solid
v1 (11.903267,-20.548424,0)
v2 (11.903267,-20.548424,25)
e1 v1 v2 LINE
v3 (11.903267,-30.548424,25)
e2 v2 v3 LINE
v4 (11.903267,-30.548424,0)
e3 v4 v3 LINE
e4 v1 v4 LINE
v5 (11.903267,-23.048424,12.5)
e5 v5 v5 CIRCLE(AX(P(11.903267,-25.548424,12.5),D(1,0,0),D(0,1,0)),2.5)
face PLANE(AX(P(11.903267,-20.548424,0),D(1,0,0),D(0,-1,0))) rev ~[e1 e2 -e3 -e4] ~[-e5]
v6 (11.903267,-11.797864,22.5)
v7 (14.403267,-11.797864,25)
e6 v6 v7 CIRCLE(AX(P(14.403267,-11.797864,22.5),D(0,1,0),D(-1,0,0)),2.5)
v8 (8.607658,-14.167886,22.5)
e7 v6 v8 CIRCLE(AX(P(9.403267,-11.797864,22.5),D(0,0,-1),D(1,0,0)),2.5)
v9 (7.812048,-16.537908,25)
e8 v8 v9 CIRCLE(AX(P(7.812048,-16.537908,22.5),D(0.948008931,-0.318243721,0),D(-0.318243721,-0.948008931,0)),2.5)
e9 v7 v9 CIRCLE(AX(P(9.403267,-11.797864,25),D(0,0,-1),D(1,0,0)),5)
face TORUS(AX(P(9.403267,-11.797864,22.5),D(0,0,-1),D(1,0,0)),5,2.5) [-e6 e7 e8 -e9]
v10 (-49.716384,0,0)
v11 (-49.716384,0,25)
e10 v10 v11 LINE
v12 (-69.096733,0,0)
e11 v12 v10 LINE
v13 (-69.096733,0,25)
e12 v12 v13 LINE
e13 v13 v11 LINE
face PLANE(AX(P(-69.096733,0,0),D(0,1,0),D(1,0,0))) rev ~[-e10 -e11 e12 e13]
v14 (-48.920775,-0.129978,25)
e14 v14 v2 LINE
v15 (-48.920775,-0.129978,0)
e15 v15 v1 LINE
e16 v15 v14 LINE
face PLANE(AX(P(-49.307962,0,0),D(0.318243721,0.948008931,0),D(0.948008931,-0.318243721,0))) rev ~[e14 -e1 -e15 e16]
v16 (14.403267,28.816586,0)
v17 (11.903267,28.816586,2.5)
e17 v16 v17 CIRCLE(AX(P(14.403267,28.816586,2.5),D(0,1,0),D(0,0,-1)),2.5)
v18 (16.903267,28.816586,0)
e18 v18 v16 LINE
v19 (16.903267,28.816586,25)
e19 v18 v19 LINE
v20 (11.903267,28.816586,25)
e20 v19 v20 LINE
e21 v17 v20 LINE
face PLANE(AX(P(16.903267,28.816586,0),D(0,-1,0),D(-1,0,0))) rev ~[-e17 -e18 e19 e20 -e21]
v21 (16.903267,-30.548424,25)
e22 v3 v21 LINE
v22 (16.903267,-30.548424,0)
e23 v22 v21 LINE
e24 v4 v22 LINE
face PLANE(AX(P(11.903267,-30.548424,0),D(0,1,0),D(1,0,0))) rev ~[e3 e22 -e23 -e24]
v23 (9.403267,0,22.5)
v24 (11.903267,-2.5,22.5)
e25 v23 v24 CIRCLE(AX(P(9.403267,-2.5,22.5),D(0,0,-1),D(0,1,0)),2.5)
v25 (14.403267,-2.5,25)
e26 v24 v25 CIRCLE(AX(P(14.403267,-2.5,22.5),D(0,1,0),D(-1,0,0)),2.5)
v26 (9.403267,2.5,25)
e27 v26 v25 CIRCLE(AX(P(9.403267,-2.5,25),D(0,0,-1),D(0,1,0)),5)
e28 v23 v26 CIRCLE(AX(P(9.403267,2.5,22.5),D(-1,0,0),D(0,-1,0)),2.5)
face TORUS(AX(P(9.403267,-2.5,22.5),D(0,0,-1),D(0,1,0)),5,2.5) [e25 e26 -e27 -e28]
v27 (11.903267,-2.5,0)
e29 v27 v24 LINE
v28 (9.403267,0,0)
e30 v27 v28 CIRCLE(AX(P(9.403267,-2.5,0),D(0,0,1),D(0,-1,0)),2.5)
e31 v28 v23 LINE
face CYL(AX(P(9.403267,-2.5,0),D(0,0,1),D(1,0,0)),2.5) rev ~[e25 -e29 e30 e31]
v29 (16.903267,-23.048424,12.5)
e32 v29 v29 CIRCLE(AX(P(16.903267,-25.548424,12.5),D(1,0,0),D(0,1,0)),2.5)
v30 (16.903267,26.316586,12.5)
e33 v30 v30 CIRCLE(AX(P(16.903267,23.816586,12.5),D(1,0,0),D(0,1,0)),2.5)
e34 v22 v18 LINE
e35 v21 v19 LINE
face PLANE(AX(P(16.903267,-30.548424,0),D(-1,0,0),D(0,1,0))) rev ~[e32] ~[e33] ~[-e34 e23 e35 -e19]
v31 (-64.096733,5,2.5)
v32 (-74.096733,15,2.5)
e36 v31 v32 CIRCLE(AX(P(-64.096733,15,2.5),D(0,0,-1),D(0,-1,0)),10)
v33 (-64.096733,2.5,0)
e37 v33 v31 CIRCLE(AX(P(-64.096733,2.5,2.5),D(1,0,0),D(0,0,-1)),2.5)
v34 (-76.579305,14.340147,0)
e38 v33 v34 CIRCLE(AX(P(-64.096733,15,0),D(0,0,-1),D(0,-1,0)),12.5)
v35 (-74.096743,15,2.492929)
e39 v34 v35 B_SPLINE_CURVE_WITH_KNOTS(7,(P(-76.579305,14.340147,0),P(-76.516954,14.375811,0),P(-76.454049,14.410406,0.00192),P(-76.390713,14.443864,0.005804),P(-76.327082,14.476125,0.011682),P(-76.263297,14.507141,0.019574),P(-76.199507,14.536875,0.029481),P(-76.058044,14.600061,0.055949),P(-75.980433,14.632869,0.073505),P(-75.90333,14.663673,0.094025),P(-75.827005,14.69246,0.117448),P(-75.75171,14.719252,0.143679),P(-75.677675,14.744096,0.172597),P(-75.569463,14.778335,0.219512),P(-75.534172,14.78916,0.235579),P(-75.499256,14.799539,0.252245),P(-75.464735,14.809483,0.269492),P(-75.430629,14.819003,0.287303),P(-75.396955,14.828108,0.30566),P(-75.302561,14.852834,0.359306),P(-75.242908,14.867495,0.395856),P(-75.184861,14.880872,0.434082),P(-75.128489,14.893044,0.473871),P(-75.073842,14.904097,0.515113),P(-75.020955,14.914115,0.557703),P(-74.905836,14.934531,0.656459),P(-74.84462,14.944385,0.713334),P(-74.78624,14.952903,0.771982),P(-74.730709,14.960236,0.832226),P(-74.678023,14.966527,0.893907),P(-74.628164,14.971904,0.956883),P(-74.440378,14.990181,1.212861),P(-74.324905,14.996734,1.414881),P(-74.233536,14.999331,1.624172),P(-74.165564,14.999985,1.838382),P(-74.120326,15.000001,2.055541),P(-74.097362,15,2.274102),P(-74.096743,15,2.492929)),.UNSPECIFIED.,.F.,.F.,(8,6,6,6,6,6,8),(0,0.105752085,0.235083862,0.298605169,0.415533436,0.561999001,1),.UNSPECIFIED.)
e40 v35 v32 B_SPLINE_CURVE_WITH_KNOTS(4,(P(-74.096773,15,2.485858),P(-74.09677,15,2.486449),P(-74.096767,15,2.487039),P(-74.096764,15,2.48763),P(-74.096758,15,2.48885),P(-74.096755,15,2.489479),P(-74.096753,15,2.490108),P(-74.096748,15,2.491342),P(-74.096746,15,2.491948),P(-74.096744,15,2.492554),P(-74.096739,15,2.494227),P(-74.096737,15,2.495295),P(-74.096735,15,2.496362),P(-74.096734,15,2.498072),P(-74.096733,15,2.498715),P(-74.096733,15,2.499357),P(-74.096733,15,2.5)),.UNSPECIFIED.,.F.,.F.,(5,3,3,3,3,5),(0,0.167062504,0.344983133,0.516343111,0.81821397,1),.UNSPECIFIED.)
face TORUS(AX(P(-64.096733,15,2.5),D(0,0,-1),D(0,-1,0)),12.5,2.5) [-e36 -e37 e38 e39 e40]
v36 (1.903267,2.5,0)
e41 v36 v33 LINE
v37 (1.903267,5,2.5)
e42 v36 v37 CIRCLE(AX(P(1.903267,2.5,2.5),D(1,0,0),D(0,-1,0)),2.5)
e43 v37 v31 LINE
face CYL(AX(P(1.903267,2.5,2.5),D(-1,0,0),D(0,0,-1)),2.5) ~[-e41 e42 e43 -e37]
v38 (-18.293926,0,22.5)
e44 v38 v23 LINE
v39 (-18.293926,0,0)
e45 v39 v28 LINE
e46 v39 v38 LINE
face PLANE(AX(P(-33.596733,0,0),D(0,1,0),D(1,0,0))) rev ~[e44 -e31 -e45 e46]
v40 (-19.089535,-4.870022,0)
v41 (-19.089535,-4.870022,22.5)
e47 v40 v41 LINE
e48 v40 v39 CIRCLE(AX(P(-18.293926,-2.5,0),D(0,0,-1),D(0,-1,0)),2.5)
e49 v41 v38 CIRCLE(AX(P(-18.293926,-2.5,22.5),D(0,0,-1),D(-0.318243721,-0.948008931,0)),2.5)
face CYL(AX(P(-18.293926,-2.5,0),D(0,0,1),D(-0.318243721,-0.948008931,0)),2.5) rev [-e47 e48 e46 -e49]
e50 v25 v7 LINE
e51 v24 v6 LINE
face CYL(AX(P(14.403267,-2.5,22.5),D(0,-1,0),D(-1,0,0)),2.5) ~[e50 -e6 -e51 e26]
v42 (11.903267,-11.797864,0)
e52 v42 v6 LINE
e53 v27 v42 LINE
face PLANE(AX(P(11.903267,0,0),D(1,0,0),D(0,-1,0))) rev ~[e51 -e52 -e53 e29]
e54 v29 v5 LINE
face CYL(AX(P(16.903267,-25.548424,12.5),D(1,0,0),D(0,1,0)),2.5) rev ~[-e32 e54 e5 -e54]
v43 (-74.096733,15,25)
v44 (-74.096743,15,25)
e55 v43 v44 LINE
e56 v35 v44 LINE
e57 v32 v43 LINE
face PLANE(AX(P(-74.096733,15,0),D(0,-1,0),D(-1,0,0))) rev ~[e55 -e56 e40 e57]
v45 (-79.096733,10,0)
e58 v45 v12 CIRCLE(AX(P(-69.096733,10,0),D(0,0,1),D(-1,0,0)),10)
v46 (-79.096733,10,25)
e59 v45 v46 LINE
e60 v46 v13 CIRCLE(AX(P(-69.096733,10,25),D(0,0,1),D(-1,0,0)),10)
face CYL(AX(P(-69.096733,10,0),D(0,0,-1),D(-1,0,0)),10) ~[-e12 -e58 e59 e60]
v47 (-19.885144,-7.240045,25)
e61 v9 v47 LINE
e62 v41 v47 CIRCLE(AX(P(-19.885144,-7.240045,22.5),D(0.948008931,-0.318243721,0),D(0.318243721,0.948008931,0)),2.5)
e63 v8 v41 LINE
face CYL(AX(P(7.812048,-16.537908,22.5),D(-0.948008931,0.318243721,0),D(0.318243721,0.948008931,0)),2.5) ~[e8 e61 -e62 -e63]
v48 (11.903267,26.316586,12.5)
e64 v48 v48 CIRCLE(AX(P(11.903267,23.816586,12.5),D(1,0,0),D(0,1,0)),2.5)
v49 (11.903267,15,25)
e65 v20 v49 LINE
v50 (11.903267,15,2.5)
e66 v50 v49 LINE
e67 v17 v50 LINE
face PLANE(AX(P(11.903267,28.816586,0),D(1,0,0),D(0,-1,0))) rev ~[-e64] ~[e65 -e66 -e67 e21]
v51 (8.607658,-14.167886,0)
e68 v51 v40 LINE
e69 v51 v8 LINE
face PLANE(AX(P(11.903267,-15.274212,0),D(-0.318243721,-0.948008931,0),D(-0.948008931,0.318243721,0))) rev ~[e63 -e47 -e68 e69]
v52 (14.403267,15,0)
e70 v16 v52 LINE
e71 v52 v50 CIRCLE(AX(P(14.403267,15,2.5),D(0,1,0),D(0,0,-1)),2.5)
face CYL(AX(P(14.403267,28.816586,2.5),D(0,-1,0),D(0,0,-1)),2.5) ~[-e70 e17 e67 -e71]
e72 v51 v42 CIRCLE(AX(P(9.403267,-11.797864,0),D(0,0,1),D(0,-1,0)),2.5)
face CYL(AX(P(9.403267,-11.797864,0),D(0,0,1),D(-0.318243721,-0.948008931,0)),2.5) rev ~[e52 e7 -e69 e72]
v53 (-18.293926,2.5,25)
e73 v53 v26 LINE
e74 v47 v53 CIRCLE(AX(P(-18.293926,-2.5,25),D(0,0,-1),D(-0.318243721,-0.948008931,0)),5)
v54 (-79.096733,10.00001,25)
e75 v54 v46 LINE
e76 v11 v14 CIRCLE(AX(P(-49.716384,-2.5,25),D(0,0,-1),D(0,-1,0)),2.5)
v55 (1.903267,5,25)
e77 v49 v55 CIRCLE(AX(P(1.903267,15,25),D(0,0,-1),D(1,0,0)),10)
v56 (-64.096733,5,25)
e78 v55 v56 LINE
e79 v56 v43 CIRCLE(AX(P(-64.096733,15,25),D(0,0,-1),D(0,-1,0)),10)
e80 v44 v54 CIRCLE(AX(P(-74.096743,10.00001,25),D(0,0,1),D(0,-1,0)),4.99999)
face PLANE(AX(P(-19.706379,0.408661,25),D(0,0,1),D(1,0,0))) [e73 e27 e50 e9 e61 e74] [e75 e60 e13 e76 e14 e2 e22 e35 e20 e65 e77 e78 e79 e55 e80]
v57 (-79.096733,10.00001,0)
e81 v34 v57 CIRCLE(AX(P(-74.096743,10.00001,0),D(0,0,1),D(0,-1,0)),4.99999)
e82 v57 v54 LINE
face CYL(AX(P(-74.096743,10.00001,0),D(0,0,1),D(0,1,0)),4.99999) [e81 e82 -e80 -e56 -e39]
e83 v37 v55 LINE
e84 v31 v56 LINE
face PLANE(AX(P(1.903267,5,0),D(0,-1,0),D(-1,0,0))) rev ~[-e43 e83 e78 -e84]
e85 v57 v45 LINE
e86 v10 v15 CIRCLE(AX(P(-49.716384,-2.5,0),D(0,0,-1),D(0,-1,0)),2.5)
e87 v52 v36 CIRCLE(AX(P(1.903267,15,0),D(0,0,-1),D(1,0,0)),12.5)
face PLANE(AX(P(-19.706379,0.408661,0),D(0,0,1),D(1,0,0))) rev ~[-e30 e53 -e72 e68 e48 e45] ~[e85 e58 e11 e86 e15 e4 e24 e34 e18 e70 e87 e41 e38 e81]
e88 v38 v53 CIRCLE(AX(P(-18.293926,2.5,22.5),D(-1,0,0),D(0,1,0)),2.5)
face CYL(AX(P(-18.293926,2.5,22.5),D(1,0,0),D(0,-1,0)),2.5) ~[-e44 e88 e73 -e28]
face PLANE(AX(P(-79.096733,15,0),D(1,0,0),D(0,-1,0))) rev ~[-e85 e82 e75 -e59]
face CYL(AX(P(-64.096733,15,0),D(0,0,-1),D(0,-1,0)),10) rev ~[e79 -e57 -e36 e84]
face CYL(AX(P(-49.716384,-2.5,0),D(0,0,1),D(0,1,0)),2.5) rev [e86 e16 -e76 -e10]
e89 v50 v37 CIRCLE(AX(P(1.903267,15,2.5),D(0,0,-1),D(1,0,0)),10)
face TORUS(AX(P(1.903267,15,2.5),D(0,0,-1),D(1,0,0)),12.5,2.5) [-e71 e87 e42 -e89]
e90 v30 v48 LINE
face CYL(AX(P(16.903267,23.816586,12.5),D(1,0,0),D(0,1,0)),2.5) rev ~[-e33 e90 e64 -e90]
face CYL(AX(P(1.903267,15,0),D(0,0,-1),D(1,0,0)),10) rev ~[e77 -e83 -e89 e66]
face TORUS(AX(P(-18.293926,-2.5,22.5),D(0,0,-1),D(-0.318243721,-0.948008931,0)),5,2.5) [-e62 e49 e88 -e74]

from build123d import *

# Parameters (mm, degrees)
F1_DEPTH = 25
F2_R     = 2.5
F3_DEPTH = 25
F4_R     = 4.99999
F5_F1_R  = 2.5
F5_F2_R  = 2.5
F5_F3_R  = 2.5


# Not quite as in the source:
# - a fillet or chamfer is up to 0.001 mm smaller than in the source, because OpenCascade refuses the exact size
# - a feature names something its author has since deleted; it is built from what else it names


with BuildPart() as f1:
    # F0 (on Top) → F1 (new body)
    with BuildSketch(Plane.XY):
        with BuildLine():
            ThreePointArc((11.9032669473, 15), (8.9743347592, 7.9289321881), (1.9032669473, 5))
            Line((1.9032669473, 5), (-64.0967330527, 5))
            ThreePointArc((-64.0967330527, 5), (-71.1678008646, 7.9289321881), (-74.0967330527, 15))
            Line((-74.0967330527, 15), (-79.0967330527, 15))
            Line((-79.0967330527, 15), (-79.0967330527, 10))
            ThreePointArc((-79.0967330527, 10), (-76.1678008646, 2.9289321881), (-69.0967330527, 0))
            Line((-69.0967330527, 0), (-49.3079621117, 0))
            Line((-49.3079621117, 0), (11.9032669473, -20.5484238273))
            Line((11.9032669473, -20.5484238273), (11.9032669473, -30.5484238273))
            Line((11.9032669473, -30.5484238273), (16.9032669473, -30.5484238273))
            Line((16.9032669473, -30.5484238273), (16.9032669473, 15))
            Line((16.9032669473, 15), (16.9032669473, 28.8165863603))
            Line((16.9032669473, 28.8165863603), (11.9032669473, 28.8165863603))
            Line((11.9032669473, 28.8165863603), (11.9032669473, 15))
        make_face()
        Polygon((-33.5967330527, 0), (11.9032669473, 0), (11.9032669473, -15.2742119136), align=None, mode=Mode.SUBTRACT)
    extrude(amount=F1_DEPTH)

    # F2 (on face) → F3 (cut)
    with BuildSketch(Plane.YZ.offset(16.9032669473)):
        with Locations((-25.5484238273, 12.5)):
            Circle(F2_R)
        with Locations((23.8165863603, 12.5)):
            Circle(F2_R)
    extrude(amount=-F3_DEPTH, mode=Mode.SUBTRACT)

    # F4 (radius 5 in the source; OpenCascade refuses exactly that, so slightly less here)
    f4_edges = [f1.edges().sort_by_distance(p)[0] for p in [
        (-79.096733, 15, 12.5),
    ]]
    fillet(f4_edges, radius=F4_R)

    # F5: fillet of radius 2.5 on 10 edges, made by hand

    # F5_f1
    f5_f1_edges = [f1.edges().sort_by_distance(p)[0] for p in [
        (-33.5967330527, 0, 12.5),
        (11.9032669473, 0, 12.5),
        (11.9032669473, -15.2742119136, 12.5),
        (-49.3079621117, 0, 12.5),
    ]]
    fillet(f5_f1_edges, radius=F5_F1_R)

    # F5_f2
    f5_f2_edges = [f1.edges().sort_by_distance(p)[0] for p in [
        (8.9743347592, 7.9289321881, 0),
        (-71.1678008646, 7.9289321881, 0),
        (-31.0967330527, 5, 0),
        (11.9032669473, 21.9082931802, 0),
    ]]
    fillet(f5_f2_edges, radius=F5_F2_R)

    # F5_f3
    f5_f3_edges = [f1.edges().sort_by_distance(p)[0] for p in [
        (11.9032669473, -7.148931772, 25),
        (-4.4453294203, 0, 25),
        (-20.7612174023, -2.0969217328, 25),
        (11.1710339003, -0.732233047, 25),
        (10.8628862029, -13.8275215518, 25),
    ]]
    fillet(f5_f3_edges, radius=F5_F3_R)


solid = f1.part
